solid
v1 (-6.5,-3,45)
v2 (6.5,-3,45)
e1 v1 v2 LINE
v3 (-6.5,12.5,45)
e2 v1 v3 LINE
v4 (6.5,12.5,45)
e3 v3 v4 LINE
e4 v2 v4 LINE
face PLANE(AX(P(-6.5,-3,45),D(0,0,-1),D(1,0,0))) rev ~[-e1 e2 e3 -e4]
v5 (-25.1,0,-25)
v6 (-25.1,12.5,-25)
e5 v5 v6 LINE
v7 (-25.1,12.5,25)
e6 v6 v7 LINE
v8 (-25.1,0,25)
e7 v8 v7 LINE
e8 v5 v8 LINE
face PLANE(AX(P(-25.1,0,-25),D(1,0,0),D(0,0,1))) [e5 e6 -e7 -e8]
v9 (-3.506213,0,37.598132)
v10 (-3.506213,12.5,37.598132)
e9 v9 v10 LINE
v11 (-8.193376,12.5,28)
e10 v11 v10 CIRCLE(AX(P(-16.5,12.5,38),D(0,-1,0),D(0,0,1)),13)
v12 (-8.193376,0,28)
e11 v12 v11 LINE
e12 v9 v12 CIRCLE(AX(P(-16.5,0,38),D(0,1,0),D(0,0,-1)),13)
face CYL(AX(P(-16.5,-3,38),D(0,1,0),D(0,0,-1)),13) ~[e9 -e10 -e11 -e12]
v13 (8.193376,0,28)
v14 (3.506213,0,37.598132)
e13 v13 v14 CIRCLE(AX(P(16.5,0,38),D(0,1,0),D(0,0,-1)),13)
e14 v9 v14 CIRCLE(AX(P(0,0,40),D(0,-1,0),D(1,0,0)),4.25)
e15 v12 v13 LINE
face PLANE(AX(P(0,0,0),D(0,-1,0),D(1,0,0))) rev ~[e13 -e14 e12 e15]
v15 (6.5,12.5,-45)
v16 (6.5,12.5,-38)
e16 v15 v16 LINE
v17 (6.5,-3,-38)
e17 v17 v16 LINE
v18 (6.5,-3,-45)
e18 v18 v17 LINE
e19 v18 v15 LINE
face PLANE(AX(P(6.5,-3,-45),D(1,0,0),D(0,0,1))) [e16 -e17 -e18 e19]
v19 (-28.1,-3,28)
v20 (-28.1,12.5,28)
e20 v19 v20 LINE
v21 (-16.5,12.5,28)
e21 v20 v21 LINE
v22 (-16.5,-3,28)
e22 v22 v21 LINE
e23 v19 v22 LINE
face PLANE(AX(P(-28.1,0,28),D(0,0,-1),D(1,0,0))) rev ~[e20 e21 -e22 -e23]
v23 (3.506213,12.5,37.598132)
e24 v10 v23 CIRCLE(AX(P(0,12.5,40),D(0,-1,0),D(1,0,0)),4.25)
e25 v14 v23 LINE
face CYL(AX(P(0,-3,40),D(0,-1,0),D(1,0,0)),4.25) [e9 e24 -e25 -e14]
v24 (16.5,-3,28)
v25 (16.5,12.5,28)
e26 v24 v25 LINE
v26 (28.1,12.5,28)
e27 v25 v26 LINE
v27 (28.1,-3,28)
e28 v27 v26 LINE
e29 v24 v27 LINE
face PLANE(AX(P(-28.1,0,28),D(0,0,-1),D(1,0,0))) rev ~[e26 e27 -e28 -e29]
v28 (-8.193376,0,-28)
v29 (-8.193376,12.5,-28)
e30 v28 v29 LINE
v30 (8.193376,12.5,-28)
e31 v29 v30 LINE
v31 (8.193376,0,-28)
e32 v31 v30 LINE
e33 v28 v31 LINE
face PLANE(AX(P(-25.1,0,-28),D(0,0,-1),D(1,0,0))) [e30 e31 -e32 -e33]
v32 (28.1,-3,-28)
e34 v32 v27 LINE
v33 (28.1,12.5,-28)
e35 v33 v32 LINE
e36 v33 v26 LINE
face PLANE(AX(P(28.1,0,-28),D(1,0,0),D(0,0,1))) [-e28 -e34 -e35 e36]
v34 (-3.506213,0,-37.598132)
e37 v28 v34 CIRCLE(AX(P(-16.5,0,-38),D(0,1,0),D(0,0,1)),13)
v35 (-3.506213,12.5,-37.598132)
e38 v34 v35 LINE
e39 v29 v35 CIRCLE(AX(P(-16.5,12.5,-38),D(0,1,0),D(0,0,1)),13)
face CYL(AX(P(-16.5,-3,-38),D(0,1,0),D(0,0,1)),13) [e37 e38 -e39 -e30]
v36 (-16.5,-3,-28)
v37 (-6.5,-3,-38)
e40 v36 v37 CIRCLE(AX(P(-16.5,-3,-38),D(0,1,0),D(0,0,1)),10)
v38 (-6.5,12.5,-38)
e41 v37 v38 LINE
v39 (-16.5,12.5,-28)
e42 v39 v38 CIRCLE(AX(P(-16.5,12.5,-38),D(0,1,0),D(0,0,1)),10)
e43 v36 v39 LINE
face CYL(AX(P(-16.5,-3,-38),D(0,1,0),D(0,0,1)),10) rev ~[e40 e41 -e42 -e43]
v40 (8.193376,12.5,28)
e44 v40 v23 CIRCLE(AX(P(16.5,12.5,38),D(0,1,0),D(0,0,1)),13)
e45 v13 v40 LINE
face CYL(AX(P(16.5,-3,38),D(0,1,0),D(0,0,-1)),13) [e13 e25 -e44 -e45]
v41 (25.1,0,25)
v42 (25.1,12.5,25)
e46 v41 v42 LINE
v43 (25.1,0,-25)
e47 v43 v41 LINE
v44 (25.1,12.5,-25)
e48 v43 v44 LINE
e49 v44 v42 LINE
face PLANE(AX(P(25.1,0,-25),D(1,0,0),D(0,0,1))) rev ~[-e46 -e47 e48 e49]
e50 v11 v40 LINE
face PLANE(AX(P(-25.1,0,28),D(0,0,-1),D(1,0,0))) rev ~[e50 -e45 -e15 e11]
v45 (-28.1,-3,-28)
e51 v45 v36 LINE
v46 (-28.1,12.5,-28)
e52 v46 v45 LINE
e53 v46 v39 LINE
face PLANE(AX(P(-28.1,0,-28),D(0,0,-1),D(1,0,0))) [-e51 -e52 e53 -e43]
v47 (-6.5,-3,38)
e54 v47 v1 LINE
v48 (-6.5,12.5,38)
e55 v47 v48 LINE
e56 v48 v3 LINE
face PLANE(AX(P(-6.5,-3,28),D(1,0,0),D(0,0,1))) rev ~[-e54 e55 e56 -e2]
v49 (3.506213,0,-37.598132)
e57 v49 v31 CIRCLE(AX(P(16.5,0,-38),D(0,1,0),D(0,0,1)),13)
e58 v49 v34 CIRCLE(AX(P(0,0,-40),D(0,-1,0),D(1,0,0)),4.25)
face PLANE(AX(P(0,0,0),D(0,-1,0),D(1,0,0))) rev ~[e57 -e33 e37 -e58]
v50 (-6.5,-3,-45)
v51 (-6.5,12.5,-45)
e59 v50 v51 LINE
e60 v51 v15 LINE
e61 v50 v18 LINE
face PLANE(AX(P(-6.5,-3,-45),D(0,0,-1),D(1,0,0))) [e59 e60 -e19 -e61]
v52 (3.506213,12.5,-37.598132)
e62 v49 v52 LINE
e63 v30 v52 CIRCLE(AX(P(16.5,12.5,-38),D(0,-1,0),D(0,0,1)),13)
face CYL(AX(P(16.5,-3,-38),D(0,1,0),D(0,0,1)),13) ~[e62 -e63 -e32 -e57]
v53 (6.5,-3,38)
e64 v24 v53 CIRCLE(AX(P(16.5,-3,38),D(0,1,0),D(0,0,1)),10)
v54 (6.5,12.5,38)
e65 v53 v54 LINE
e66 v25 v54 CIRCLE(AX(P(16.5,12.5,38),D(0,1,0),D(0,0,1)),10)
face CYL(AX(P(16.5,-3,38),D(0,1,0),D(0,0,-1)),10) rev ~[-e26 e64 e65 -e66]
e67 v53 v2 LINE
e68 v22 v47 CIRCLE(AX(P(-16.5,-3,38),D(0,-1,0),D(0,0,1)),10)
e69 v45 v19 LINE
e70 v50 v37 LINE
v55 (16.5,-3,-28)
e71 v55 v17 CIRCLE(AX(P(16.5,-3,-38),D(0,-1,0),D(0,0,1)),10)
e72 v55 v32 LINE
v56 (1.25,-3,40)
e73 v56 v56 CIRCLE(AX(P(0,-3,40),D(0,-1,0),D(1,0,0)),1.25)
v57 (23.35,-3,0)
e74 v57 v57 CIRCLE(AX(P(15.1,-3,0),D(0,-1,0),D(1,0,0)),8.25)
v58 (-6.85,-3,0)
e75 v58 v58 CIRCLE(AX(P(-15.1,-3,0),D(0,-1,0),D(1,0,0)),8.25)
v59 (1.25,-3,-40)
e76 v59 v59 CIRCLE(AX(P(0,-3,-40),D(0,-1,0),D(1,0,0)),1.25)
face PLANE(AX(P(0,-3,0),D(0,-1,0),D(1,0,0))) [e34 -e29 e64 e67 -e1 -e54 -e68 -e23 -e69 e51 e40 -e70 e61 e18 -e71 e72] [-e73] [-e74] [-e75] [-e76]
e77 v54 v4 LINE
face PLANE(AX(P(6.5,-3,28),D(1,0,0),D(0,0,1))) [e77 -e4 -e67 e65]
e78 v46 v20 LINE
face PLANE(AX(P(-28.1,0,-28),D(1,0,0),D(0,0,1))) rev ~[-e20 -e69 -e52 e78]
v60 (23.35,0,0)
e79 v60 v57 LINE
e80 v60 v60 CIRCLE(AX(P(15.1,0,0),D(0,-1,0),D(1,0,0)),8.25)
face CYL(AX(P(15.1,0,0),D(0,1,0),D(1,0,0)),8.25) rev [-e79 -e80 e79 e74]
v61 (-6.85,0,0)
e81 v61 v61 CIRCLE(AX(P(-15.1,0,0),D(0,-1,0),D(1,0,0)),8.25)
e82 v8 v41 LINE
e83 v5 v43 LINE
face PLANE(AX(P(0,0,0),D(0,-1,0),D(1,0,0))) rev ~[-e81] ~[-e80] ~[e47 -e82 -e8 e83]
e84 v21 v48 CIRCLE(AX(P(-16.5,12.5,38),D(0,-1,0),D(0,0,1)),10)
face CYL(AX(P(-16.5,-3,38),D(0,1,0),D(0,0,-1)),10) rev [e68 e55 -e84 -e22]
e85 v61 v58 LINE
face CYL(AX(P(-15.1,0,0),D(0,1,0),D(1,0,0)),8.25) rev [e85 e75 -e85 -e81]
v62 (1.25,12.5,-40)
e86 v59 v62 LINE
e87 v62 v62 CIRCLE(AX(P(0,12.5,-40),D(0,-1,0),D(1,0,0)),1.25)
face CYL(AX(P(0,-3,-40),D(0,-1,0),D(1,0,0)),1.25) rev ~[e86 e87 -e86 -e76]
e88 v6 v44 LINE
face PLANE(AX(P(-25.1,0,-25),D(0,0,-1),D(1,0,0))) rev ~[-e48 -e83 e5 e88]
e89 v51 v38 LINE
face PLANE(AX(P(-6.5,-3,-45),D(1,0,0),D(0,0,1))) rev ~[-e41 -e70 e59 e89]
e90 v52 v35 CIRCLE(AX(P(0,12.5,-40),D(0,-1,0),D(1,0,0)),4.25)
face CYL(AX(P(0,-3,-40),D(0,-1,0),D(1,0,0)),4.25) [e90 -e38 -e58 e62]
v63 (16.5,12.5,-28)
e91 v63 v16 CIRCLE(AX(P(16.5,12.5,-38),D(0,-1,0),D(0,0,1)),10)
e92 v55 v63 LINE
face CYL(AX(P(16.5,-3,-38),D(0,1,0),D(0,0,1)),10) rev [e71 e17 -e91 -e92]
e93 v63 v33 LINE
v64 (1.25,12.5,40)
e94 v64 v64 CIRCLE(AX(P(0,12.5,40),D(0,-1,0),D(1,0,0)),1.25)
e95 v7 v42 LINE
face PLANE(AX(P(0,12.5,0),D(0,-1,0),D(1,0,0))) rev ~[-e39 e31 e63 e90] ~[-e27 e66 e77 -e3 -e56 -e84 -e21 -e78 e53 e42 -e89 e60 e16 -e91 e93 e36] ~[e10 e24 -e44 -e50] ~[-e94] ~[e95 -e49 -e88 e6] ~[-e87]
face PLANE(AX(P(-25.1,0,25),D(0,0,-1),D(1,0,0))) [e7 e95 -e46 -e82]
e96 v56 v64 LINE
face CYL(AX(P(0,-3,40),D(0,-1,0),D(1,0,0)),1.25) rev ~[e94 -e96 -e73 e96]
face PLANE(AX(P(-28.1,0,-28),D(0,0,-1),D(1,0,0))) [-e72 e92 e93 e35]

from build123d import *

# Parameters (mm, degrees)
F0_W        = 56.2
F0_H        = 56
F0_W_2      = 50.2
F0_H_2      = 50
F0_R        = 8.25
F1_DEPTH    = 3
F2_DEPTH    = 12.5
F3_W        = 13
F3_H        = 17
F3_R        = 1.25
F4_DEPTH    = 15.5
F5_R        = 10
F6_T        = 3
F6_T3_DEPTH = 56.2
F6_T5_DEPTH = 56
F6_T7_DEPTH = 18.5


# Not quite as in the source:
# - a shell that OpenCascade refuses in one call is made with other operations: the cavity is built on its own and cut out


with BuildPart() as f1:
    # F0 (on Front) → F1 (new body)
    with BuildSketch(Plane.XZ):
        Rectangle(F0_W, F0_H)
        Rectangle(F0_W_2, F0_H_2, mode=Mode.SUBTRACT)
        Rectangle(F0_W_2, F0_H_2)
        with Locations((-15.1, 0)):
            Circle(F0_R, mode=Mode.SUBTRACT)
        with Locations((15.1, 0)):
            Circle(F0_R, mode=Mode.SUBTRACT)
    extrude(amount=F1_DEPTH)

    # F0 (on Front) → F2 (join)
    with BuildSketch(Plane.XZ):
        Rectangle(F0_W, F0_H)
        Rectangle(F0_W_2, F0_H_2, mode=Mode.SUBTRACT)
    extrude(amount=-F2_DEPTH)

    # F3 (on face) → F4 (join, through all)
    with BuildSketch(Plane.XZ.offset(3)):
        with Locations((0, 36.5)):
            Rectangle(F3_W, F3_H)
        with Locations((0, 40)):
            Circle(F3_R, mode=Mode.SUBTRACT)
        with Locations((0, -36.5)):
            Rectangle(F3_W, F3_H)
        with Locations((0, -40)):
            Circle(F3_R, mode=Mode.SUBTRACT)
    extrude(amount=-F4_DEPTH)

    # F5
    f5_edges = [f1.edges().sort_by_distance(p)[0] for p in [
        (6.5, 4.75, -28),
        (-6.5, 4.75, -28),
        (-6.5, 4.75, 28),
        (6.5, 4.75, 28),
    ]]
    fillet(f5_edges, radius=F5_R)

    # F6: shell of thickness 3, made by hand


with BuildPart() as f6_core1:
    # F6_t2: copy of F1
    add(f1.part)

    # the walls: a layer under each face that stays
    f6_faces = [f6_core1.faces().sort_by_distance(p)[0] for p in [
        (0, -3, 0),
        (22.3, 4.75, 28),
        (9.4289321881, 4.75, 30.9289321881),
        (28.1, 4.75, 0),
        (6.5, 4.75, 41.5),
        (22.3, 4.75, -28),
        (0, 4.75, 45),
        (9.4289321881, 4.75, -30.9289321881),
        (-6.5, 4.75, 41.5),
        (6.5, 4.75, -41.5),
        (-9.4289321881, 4.75, 30.9289321881),
        (0, 4.75, -45),
        (-22.3, 4.75, 28),
        (-6.5, 4.75, -41.5),
        (-28.1, 4.75, 0),
        (-9.4289321881, 4.75, -30.9289321881),
        (-22.3, 4.75, -28),
        (-23.35, -1.5, 0),
        (6.85, -1.5, 0),
        (-1.25, 4.75, 40),
        (-1.25, 4.75, -40),
        (0, 0, 0),
        (0, 6.25, 25),
        (25.1, 6.25, 0),
        (0, 6.25, -25),
        (-25.1, 6.25, 0),
    ]]
    thicken(f6_faces, amount=-F6_T, mode=Mode.SUBTRACT)

    # F6_s4 → F6_t3 (cut)
    with BuildSketch(Plane.YZ.offset(-28.1)):
        Polygon((0.03, 24.97), (-3, 25), (-3, 28), (0, 28), align=None)
        Polygon((0.03, -24.97), (-3, -25), (-3, -28), (0, -28), align=None)
    extrude(amount=F6_T3_DEPTH, mode=Mode.SUBTRACT)

    # F6_s6 → F6_t5 (cut)
    with BuildSketch(Plane.XY.offset(-28)):
        Polygon((25.07, 0.03), (25.1, -3), (28.1, -3), (28.1, 0), align=None)
        Polygon((-25.07, 0.03), (-25.1, -3), (-28.1, -3), (-28.1, 0), align=None)
    extrude(amount=F6_T5_DEPTH, mode=Mode.SUBTRACT)

    # F6_s8 → F6_t7 (cut)
    with BuildSketch(Plane.XZ.offset(-15.5)):
        Polygon((-25.07, 24.97), (-25.1, 28), (-28.1, 28), (-28.1, 25), align=None)
        Polygon((25.07, 24.97), (25.1, 28), (28.1, 28), (28.1, 25), align=None)
        Polygon((25.07, -24.97), (28.1, -25), (28.1, -28), (25.1, -28), align=None)
        Polygon((-25.07, -24.97), (-25.1, -28), (-28.1, -28), (-28.1, -25), align=None)
    extrude(amount=F6_T7_DEPTH, mode=Mode.SUBTRACT)


with BuildPart() as f1_1:
    add(f1.part)

    # what is left inside the walls is the cavity
    f6_cavity = [f6_core1.part.solids().sort_by_distance(p)[0] for p in [
        (0, 8.333333, 28.03),
        (0, 8.333333, -28.03),
    ]]
    add(f6_cavity, mode=Mode.SUBTRACT)


solid = f1_1.part
